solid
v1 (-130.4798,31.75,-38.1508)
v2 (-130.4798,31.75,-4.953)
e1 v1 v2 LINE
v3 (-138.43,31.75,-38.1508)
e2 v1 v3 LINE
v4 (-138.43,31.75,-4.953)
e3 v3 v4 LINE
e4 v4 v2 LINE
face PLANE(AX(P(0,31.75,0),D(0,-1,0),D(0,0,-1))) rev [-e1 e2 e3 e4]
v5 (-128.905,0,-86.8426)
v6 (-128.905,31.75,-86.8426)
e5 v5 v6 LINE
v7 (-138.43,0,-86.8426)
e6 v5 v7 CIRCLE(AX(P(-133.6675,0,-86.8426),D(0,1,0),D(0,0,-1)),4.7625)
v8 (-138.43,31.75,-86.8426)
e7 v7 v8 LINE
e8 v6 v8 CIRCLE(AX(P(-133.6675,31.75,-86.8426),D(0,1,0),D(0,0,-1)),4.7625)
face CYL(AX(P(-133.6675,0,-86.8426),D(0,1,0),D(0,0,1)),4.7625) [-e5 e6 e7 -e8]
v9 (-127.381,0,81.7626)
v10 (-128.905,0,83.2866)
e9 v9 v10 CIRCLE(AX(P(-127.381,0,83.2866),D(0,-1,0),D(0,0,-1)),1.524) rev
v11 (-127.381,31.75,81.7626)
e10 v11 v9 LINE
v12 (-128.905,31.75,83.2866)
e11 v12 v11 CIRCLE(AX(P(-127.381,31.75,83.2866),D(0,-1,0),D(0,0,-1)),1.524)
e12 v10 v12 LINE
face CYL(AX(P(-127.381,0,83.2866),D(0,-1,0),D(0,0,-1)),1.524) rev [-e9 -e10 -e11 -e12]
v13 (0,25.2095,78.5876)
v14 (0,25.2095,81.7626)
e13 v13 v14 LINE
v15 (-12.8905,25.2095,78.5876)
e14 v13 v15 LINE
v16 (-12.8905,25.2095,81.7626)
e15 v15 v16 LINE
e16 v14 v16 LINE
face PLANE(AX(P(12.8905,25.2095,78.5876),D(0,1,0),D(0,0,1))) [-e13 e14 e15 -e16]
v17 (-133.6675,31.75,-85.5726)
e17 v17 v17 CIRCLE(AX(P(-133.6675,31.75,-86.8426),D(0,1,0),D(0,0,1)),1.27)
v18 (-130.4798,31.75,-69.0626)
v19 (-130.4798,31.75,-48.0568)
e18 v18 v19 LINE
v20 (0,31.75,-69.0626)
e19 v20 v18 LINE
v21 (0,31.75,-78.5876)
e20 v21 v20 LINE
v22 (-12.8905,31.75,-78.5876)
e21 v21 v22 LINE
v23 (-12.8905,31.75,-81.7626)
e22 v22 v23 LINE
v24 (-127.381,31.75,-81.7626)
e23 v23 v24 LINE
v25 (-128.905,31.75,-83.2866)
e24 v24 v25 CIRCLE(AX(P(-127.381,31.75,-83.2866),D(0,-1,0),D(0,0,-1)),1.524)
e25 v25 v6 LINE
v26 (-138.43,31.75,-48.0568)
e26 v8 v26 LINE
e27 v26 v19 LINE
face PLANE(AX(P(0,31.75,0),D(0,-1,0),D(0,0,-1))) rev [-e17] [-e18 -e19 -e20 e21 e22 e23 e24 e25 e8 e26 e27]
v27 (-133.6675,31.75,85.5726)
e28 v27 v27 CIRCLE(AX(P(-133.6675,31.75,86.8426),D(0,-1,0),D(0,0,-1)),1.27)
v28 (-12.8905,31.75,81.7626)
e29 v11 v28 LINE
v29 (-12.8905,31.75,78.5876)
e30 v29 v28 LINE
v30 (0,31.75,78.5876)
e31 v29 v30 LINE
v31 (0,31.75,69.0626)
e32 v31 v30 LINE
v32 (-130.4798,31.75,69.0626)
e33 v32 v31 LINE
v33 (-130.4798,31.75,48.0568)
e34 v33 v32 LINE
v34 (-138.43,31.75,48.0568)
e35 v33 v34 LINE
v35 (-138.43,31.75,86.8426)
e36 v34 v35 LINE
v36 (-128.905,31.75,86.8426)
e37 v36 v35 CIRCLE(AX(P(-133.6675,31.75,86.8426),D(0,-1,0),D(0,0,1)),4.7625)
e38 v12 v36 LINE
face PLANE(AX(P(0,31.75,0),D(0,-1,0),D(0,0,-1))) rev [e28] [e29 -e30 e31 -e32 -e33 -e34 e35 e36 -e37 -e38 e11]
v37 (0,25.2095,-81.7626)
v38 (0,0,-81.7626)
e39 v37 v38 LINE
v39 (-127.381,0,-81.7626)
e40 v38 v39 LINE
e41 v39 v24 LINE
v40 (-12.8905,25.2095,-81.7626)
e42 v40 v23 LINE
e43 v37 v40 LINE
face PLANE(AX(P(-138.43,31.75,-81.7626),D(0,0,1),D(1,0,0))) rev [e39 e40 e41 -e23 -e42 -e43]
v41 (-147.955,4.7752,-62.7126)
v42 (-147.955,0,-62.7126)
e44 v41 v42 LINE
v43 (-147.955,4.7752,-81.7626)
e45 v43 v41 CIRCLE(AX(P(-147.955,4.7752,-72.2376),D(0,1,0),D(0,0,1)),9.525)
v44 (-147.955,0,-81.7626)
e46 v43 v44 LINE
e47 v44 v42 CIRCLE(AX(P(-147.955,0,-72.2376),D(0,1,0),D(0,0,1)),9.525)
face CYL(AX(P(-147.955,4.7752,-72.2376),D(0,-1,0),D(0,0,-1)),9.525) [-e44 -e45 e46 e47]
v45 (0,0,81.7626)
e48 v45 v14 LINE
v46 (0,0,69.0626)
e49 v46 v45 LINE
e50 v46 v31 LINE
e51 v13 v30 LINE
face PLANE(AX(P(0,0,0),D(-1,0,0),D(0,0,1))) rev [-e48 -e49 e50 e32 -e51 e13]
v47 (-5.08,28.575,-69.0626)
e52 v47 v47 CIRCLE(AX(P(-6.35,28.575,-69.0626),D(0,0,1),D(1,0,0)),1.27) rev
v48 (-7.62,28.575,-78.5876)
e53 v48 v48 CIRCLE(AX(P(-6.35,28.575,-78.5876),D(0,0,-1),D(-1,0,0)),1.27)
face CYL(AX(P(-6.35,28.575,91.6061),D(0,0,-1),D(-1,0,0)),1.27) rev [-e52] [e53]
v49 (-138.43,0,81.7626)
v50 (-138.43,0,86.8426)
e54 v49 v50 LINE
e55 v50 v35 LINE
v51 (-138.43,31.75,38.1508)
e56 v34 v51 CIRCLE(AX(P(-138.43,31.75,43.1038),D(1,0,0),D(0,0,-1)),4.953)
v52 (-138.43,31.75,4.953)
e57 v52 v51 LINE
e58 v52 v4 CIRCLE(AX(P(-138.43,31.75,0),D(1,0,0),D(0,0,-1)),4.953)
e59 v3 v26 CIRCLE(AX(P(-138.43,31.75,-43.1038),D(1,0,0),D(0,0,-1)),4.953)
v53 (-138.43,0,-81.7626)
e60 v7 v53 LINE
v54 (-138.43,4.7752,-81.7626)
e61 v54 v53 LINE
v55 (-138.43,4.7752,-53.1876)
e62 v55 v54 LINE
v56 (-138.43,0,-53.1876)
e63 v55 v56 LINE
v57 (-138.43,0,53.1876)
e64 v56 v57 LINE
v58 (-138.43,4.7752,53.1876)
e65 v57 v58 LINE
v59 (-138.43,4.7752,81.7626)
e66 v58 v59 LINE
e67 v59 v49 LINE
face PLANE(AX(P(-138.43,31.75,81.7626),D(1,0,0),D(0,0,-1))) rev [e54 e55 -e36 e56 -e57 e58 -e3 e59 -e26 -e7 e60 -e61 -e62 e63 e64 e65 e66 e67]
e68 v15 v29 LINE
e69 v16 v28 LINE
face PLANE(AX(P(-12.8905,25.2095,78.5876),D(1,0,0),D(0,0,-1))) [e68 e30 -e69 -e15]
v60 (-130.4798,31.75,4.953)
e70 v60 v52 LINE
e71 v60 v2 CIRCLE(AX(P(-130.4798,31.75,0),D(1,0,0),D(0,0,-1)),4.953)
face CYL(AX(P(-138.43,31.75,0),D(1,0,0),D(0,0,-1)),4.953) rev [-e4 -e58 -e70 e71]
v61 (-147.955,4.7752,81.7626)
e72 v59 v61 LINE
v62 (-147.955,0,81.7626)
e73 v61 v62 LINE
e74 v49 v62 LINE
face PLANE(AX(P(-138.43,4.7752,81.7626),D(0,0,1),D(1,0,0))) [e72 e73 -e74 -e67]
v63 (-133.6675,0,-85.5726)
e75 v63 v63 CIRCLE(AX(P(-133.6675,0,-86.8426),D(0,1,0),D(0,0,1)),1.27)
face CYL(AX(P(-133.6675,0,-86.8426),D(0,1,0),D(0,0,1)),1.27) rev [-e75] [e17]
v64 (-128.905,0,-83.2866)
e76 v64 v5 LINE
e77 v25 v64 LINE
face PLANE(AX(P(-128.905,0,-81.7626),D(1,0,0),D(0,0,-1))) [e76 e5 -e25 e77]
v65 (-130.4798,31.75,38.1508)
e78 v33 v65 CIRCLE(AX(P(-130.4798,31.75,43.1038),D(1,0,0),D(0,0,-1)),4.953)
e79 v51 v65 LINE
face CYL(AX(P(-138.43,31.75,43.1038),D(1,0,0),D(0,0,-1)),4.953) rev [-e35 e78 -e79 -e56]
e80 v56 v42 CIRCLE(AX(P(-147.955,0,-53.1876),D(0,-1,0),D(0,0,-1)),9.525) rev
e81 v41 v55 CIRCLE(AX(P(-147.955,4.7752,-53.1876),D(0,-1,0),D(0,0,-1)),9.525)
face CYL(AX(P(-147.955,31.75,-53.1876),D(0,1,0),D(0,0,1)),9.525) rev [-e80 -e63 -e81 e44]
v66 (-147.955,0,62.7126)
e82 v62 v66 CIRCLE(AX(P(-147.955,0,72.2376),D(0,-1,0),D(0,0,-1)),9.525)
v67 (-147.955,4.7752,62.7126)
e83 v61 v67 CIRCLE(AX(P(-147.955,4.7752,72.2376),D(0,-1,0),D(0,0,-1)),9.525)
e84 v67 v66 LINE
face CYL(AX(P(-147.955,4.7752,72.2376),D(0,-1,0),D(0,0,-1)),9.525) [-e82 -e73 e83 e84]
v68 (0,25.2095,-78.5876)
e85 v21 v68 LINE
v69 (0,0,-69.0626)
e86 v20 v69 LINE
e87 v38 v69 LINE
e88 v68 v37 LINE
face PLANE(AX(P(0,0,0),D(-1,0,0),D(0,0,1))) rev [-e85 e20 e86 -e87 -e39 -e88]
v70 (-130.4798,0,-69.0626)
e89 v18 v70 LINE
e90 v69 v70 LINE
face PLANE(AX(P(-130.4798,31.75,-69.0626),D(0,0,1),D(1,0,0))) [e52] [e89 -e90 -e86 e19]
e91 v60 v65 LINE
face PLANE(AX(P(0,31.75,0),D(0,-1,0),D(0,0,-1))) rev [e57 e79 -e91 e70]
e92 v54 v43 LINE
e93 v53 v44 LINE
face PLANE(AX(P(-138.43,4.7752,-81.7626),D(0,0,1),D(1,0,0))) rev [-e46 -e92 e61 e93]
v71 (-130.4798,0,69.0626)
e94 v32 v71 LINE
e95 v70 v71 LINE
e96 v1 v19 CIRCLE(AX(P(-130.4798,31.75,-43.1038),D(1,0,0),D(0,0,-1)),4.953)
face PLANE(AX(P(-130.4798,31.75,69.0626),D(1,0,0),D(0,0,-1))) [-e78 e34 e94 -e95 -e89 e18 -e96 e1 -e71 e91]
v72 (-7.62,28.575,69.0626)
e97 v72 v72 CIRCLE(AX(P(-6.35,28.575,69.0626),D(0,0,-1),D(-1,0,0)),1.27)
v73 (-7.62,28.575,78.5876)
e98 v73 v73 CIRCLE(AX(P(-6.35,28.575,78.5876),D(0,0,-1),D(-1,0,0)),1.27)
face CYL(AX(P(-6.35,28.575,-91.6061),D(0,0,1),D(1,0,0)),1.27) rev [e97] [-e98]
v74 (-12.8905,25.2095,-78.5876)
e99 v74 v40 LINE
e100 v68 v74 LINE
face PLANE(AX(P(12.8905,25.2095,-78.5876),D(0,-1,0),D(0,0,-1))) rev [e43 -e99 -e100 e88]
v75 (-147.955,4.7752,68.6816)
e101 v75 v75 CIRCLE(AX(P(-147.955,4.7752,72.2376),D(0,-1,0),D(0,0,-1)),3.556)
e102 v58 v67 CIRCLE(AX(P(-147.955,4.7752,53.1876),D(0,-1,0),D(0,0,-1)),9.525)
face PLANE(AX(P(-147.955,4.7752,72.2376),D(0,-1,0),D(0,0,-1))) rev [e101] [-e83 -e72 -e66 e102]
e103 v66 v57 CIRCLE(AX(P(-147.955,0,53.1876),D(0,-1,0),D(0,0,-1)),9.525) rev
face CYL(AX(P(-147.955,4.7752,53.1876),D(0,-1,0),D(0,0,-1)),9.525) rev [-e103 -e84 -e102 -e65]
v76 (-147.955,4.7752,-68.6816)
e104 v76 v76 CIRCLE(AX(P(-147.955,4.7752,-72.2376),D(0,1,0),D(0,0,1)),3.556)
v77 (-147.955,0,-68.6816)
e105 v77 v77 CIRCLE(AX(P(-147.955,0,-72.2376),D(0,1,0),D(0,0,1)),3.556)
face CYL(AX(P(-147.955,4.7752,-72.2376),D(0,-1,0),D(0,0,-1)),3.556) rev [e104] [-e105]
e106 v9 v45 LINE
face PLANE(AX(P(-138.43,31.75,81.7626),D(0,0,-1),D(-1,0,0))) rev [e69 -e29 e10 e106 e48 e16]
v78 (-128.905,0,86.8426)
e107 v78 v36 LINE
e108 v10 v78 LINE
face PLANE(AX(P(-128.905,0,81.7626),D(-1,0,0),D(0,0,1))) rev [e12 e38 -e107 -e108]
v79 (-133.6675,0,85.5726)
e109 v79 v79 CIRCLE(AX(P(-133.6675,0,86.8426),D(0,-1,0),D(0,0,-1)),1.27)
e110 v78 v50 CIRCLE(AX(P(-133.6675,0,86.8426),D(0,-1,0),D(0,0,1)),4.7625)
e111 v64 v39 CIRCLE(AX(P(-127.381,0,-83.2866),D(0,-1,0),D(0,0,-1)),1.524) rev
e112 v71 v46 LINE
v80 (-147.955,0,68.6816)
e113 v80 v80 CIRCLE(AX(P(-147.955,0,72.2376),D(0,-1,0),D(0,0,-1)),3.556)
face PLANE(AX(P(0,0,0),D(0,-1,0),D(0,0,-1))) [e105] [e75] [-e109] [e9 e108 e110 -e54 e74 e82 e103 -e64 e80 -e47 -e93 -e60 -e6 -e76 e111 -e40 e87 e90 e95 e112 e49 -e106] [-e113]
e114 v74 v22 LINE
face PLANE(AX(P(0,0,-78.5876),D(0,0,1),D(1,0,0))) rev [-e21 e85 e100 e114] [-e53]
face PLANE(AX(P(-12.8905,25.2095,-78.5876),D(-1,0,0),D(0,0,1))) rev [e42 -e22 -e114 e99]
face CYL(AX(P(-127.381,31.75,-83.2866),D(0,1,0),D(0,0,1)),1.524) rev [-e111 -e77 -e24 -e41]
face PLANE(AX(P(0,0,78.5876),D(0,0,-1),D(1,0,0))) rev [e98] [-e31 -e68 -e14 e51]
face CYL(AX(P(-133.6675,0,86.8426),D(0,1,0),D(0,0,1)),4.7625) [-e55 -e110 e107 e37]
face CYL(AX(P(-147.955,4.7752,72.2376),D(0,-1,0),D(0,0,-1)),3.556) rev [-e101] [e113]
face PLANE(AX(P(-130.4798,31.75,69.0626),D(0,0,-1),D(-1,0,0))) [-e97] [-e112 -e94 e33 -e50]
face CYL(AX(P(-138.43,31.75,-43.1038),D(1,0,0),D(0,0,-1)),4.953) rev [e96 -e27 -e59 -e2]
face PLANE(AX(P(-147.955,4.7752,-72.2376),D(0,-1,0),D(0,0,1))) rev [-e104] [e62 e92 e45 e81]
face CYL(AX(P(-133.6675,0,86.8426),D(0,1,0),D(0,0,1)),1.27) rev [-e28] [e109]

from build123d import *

# Parameters (mm, degrees)
SKETCH1_W               = 276.86
SKETCH1_H               = 163.5252
SKETCH1_W_2             = 260.9596
SKETCH1_H_2             = 138.1252
BOSS_EXTRUDE1_DEPTH     = 31.75
SKETCH2_R               = 4.953
CUT_EXTRUDE1_DEPTH      = 291.421495173
SKETCH3_R               = 1.27
BOSS_EXTRUDE2_DEPTH     = 31.75
MIRROR4_COPY_1_SKETCH_R = 1.27
MIRROR4_COPY_1_DEPTH    = 31.75
FILLET2_R               = 1.524
SKETCH4_W               = 25.781
SKETCH4_H               = 13.081
CUT_EXTRUDE2_DEPTH      = 3.175
CUT_EXTRUDE3_REACH      = 223.668
SKETCH5_R               = 1.27
CUT_EXTRUDE4_DEPTH      = 170.004206297
SKETCH7_R               = 3.556
BOSS_EXTRUDE3_DEPTH     = 4.7752
FILLET3_R               = 9.525


with BuildPart() as part:
    # Sketch1 → Boss-Extrude1 (new body)
    with BuildSketch(Plane(origin=(0, 0, 0), x_dir=(1, 0, 0), z_dir=(0, 1, 0))):
        Rectangle(SKETCH1_W, SKETCH1_H)
        Rectangle(SKETCH1_W_2, SKETCH1_H_2, mode=Mode.SUBTRACT)
    extrude(amount=BOSS_EXTRUDE1_DEPTH)

    # Sketch2 → Cut-Extrude1 (cut, through all)
    with BuildSketch(Plane(origin=(138.43, 0, 0), x_dir=(0, 0, -1), z_dir=(1, 0, 0))):
        with Locations((0, 31.75)):
            Circle(SKETCH2_R)
        with Locations((43.1038, 31.75)):
            Circle(SKETCH2_R)
        with Locations((-43.1038, 31.75)):
            Circle(SKETCH2_R)
    extrude(amount=-CUT_EXTRUDE1_DEPTH, mode=Mode.SUBTRACT)

    # Sketch3 → Boss-Extrude2 (add, through all)
    with BuildSketch(Plane(origin=(0, 31.75, 0), x_dir=(1, 0, 0), z_dir=(0, 1, 0))):
        with BuildLine():
            Line((-138.43, 81.7626), (-138.43, 86.8426))
            ThreePointArc((-138.43, 86.8426), (-133.6675, 91.6051), (-128.905, 86.8426))
            Line((-128.905, 86.8426), (-128.905, 81.7626))
            Line((-128.905, 81.7626), (-138.43, 81.7626))
        make_face()
        with Locations(Location((-133.6675, 86.8426, 0), (0, 0, 270))):
            Circle(SKETCH3_R, mode=Mode.SUBTRACT)
    boss_extrude2 = extrude(amount=-BOSS_EXTRUDE2_DEPTH)

    # Mirror3: Boss-Extrude2 across plane
    add(boss_extrude2.mirror(Plane(origin=(0, 0, 0), x_dir=(0, 0, 1), z_dir=(1, 0, 0))))

    # Mirror4: Boss-Extrude2 across plane
    add(boss_extrude2.mirror(Plane.XY))

    # Mirror4 copy 1 sketch → Mirror4 copy 1 (add, through all)
    with BuildSketch(Plane(origin=(0, 31.75, 0), x_dir=(-1, 0, 0), z_dir=(0, 1, 0))):
        with BuildLine():
            Line((-138.43, 81.7626), (-138.43, 86.8426))
            ThreePointArc((-138.43, 86.8426), (-133.6675, 91.6051), (-128.905, 86.8426))
            Line((-128.905, 86.8426), (-128.905, 81.7626))
            Line((-128.905, 81.7626), (-138.43, 81.7626))
        make_face()
        with Locations(Location((-133.6675, 86.8426, 0), (0, 0, 270))):
            Circle(MIRROR4_COPY_1_SKETCH_R, mode=Mode.SUBTRACT)
    extrude(amount=-MIRROR4_COPY_1_DEPTH)

    # Fillet2
    fillet2_edges = [part.edges().sort_by_distance(p)[0] for p in [
        (-128.905, 15.875, 81.7626),
        (128.905, 15.875, 81.7626),
        (-128.905, 15.875, -81.7626),
        (128.905, 15.875, -81.7626),
    ]]
    fillet(fillet2_edges, radius=FILLET2_R)

    # Sketch4 → Cut-Extrude2 (cut)
    with BuildSketch(Plane(origin=(0, 0, -81.7626), x_dir=(-1, 0, 0), z_dir=(0, 0, -1))):
        with Locations((0, 31.75)):
            Rectangle(SKETCH4_W, SKETCH4_H)
    cut_extrude2 = extrude(amount=-CUT_EXTRUDE2_DEPTH, mode=Mode.SUBTRACT)

    # Sketch5 → Cut-Extrude3 (cut, up to next)
    with BuildSketch(Plane(origin=(0, 0, -78.5876), x_dir=(-1, 0, 0), z_dir=(0, 0, -1)), mode=Mode.PRIVATE) as cut_extrude3_sk1:
        with Locations((-6.35, 28.575)):
            Circle(SKETCH5_R)
    cut_extrude3_tool1 = extrude(cut_extrude3_sk1.sketch, amount=-CUT_EXTRUDE3_REACH, mode=Mode.PRIVATE) & part.part
    # Sketch5 → Cut-Extrude3 (cut, up to next)
    with BuildSketch(Plane(origin=(0, 0, -78.5876), x_dir=(-1, 0, 0), z_dir=(0, 0, -1)), mode=Mode.PRIVATE) as cut_extrude3_sk2:
        with Locations((6.35, 28.575)):
            Circle(SKETCH5_R)
    cut_extrude3_tool2 = extrude(cut_extrude3_sk2.sketch, amount=-CUT_EXTRUDE3_REACH, mode=Mode.PRIVATE) & part.part
    cut_extrude3_1 = cut_extrude3_tool1.solids().sort_by_distance((6.35, 28.575, -78.5876))[0]
    add(cut_extrude3_1, mode=Mode.SUBTRACT)
    cut_extrude3_2 = cut_extrude3_tool2.solids().sort_by_distance((-6.35, 28.575, -78.5876))[0]
    add(cut_extrude3_2, mode=Mode.SUBTRACT)
    cut_extrude3 = cut_extrude3_1 + cut_extrude3_2  # Cut-Extrude3 as one shape, for the pattern or mirror that repeats it

    # Mirror5: Cut-Extrude2, Cut-Extrude3 across plane
    add(cut_extrude2.mirror(Plane.XY), mode=Mode.SUBTRACT)
    add(cut_extrude3.mirror(Plane.XY), mode=Mode.SUBTRACT)

    # Sketch6 → Cut-Extrude4 (cut, through all)
    with BuildSketch(Plane(origin=(0, 31.75, 0), x_dir=(1, 0, 0), z_dir=(0, 1, 0))):
        Polygon((0, 0), (0, 94.782822777), (154.500251477, 94.782822777), (154.500251477, -104.416951251), (0, -98.891495214), align=None)
    extrude(amount=-CUT_EXTRUDE4_DEPTH, mode=Mode.SUBTRACT)

    # Sketch7 → Boss-Extrude3 (add)
    with BuildSketch(Plane.XZ):
        with BuildLine():
            Line((-138.43, 81.7626), (-147.955, 81.7626))
            ThreePointArc((-147.955, 81.7626), (-157.48, 72.2376), (-147.955, 62.7126))
            Line((-147.955, 62.7126), (-138.43, 62.7126))
            Line((-138.43, 62.7126), (-138.43, 81.7626))
        make_face()
        with Locations(Location((-147.955, 72.2376, 0), (0, 0, 270))):
            Circle(SKETCH7_R, mode=Mode.SUBTRACT)
    boss_extrude3 = extrude(amount=-BOSS_EXTRUDE3_DEPTH)

    # Mirror6: Boss-Extrude3 across plane
    add(boss_extrude3.mirror(Plane.XY))

    # Fillet3
    fillet3_edges = [part.edges().sort_by_distance(p)[0] for p in [
        (-138.43, 2.3876, -62.7126),
        (-138.43, 2.3876, 62.7126),
    ]]
    fillet(fillet3_edges, radius=FILLET3_R - 0.0001)  # a hair under: the kernel refuses the full size


solid = part.part
